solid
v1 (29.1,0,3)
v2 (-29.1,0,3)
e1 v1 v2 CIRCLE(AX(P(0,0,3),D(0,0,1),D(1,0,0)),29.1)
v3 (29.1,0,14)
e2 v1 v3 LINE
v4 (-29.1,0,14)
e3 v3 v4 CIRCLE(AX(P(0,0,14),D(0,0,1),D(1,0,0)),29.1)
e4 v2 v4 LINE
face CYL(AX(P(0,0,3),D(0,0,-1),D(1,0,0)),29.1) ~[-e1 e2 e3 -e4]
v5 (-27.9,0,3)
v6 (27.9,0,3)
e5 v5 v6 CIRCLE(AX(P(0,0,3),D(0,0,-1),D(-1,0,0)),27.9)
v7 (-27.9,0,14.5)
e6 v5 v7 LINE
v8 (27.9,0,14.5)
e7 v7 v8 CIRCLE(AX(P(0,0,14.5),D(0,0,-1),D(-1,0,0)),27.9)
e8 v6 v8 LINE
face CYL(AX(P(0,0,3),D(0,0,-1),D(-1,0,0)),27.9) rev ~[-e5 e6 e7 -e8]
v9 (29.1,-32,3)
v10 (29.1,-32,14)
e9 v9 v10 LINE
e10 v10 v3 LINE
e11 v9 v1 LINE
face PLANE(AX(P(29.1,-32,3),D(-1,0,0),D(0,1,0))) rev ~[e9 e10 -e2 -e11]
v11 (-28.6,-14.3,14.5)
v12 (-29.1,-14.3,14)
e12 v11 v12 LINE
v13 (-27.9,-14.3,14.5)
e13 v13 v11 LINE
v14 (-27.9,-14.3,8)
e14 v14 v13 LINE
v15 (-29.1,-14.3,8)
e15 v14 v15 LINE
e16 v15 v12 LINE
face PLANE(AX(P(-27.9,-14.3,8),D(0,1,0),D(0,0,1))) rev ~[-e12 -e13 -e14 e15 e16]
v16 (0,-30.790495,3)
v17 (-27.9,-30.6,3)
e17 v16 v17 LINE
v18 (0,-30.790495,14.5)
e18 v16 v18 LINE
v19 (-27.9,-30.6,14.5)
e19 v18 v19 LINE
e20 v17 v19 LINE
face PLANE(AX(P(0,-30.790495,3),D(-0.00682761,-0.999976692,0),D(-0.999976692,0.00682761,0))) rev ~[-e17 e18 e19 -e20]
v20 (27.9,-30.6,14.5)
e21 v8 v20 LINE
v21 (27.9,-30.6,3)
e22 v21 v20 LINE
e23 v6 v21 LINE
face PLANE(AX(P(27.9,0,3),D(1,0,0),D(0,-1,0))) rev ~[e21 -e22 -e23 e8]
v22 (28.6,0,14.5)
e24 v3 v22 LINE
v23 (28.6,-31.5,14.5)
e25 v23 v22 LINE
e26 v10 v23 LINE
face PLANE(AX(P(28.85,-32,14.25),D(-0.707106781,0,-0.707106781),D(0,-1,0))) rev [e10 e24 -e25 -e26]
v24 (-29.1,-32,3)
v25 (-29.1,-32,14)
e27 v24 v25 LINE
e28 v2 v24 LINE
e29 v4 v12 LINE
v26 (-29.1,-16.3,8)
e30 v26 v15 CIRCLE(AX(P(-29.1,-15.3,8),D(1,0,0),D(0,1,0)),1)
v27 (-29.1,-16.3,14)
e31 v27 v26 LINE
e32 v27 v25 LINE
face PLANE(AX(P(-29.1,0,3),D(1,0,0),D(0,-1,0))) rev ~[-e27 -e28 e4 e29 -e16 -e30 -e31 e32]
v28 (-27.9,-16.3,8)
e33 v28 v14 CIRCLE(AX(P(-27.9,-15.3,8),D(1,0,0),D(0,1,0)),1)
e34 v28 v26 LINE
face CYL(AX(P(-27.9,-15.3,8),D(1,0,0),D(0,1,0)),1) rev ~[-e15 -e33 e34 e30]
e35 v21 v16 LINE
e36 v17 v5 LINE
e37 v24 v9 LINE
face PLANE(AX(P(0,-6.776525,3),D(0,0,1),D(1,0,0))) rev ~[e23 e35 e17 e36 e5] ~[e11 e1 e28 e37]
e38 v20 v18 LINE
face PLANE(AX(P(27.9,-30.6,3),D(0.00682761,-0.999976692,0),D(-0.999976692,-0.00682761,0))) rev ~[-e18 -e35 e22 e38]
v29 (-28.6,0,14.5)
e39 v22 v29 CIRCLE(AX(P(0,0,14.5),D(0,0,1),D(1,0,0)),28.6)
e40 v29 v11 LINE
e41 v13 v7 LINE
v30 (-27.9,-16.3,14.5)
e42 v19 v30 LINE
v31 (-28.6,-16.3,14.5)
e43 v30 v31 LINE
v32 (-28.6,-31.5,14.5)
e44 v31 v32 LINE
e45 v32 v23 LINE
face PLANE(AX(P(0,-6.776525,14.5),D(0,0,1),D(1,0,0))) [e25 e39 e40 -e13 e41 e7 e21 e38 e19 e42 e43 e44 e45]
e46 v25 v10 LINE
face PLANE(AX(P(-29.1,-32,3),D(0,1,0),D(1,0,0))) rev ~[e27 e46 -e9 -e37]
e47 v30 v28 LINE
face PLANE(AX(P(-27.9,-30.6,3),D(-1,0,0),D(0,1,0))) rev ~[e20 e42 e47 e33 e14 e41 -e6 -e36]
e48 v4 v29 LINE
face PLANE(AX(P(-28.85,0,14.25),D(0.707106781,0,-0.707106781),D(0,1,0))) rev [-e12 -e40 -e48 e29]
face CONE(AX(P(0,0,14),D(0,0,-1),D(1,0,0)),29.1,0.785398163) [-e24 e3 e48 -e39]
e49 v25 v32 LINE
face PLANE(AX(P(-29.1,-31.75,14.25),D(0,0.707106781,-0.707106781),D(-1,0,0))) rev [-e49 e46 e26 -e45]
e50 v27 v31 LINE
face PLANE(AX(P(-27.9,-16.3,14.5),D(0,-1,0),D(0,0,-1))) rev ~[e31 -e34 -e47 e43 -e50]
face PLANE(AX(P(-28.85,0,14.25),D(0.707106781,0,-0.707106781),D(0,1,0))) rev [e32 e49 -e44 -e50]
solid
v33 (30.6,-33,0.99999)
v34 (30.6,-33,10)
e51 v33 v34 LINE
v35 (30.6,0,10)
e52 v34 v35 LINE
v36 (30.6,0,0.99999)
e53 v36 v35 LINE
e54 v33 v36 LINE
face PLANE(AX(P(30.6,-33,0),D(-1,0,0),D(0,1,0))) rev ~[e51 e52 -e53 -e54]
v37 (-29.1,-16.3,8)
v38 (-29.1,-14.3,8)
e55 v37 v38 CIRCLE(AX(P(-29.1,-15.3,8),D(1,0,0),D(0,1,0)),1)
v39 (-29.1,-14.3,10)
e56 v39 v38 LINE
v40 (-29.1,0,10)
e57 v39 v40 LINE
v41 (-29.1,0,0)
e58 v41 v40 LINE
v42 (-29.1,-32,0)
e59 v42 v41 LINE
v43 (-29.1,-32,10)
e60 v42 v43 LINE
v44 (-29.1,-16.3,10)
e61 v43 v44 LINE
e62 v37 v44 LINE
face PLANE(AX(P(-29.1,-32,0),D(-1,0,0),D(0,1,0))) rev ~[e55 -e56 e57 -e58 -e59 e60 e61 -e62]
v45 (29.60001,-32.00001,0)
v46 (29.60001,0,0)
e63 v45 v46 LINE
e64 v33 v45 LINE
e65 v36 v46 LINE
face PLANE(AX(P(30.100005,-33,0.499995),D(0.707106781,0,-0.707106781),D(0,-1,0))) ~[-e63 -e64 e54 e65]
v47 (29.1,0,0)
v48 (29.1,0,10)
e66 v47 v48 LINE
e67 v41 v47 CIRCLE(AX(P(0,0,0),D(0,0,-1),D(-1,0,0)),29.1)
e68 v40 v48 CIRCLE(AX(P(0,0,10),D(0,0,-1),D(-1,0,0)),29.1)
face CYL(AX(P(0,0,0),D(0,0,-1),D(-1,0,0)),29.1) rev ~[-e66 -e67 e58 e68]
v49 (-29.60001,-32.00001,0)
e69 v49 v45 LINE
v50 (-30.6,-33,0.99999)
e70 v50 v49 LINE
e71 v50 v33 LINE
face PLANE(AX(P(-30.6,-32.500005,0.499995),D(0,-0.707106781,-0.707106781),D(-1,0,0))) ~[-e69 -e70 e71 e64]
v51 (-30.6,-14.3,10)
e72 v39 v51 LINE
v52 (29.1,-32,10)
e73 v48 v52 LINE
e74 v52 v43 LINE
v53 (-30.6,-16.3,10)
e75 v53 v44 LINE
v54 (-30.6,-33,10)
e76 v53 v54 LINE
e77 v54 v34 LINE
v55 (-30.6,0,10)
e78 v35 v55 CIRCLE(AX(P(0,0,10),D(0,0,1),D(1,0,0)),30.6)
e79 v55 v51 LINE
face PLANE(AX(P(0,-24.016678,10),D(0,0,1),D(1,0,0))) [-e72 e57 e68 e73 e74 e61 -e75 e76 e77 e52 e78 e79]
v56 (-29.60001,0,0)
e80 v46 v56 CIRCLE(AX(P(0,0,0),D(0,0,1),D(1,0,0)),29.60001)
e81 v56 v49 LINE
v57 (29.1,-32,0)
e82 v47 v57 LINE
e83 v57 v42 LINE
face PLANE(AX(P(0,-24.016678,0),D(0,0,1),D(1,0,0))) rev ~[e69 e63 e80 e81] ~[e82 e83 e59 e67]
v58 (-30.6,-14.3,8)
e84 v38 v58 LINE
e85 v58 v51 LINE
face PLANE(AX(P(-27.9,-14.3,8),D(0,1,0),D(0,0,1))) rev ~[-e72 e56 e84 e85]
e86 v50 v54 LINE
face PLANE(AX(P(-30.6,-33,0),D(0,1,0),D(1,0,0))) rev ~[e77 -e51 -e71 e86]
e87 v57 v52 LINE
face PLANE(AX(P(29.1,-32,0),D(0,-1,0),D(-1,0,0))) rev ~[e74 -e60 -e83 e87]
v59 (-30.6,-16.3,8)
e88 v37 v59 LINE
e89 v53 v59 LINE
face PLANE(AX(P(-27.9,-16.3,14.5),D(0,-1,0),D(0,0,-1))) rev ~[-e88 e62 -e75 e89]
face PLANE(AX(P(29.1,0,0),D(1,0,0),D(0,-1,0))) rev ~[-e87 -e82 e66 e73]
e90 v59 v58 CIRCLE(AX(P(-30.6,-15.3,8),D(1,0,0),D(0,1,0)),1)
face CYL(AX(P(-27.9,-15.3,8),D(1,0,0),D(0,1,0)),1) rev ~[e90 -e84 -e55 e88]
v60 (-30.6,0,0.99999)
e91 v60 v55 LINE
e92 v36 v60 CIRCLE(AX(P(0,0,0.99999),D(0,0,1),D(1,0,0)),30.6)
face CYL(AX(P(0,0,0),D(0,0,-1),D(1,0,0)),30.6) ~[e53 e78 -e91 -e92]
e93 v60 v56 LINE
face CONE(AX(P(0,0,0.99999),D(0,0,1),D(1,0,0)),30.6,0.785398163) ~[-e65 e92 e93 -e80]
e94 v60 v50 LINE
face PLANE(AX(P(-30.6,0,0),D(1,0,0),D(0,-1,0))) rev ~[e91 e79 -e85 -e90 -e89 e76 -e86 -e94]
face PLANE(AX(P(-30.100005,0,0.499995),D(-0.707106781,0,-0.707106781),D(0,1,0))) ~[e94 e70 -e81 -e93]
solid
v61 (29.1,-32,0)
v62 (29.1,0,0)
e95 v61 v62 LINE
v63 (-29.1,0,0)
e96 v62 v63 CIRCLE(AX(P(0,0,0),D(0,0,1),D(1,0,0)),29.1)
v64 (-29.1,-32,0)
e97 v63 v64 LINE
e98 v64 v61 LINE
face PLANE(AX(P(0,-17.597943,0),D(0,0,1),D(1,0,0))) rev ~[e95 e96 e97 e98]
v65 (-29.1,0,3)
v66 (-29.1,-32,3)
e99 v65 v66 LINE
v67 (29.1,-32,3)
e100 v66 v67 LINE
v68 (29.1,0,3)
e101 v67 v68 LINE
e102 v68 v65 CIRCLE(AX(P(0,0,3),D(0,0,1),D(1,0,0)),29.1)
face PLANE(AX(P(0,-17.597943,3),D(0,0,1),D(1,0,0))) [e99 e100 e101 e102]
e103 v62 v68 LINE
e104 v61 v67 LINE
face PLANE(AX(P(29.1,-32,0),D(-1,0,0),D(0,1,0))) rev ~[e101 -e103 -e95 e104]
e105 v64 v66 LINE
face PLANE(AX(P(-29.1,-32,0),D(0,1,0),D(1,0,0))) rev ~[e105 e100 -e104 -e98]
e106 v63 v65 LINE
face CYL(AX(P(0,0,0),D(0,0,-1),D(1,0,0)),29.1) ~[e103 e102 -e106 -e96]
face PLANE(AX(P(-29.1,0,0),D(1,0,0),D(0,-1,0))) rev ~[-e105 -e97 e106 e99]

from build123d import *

# Parameters (mm, degrees)
F3_DEPTH  = 3
F4_DEPTH  = 10
F5_SIZE   = 0.99999
F8_DEPTH  = 11.5
F9_SIZE   = 0.5
F11_DEPTH = 25


# Not quite as in the source:
# - a fillet or chamfer is up to 0.001 mm smaller than in the source, because OpenCascade refuses the exact size
# - a feature of the source that left no trace in its solid (it failed there, or was rolled back) is left out
# - a feature names something its author has since deleted; it is built from what else it names


with BuildPart() as f3:
    # F2 (on Top) → F3 (new body)
    with BuildSketch(Plane.XY):
        with BuildLine():
            Line((29.1, -9.4630861774), (29.1, 0))
            ThreePointArc((29.1, 0), (0, -29.1), (-29.1, 0))
            Line((-29.1, 0), (-29.1, -9.4630861774))
            ThreePointArc((-29.1, -9.4630861774), (0, -30.6), (29.1, -9.4630861774))
        make_face()
        with BuildLine():
            ThreePointArc((-29.1, 0), (0, -29.1), (29.1, 0))
            Line((29.1, 0), (-29.1, 0))
        make_face()
        with BuildLine():
            Line((-29.1, 0), (29.1, 0))
            ThreePointArc((29.1, 0), (0, 29.1), (-29.1, 0))
        make_face()
        with BuildLine():
            Line((29.1, -32), (29.1, -9.4630861774))
            ThreePointArc((29.1, -9.4630861774), (0, -30.6), (-29.1, -9.4630861774))
            Line((-29.1, -9.4630861774), (-29.1, -32))
            Line((-29.1, -32), (29.1, -32))
        make_face()
    extrude(amount=F3_DEPTH)


with BuildPart() as f4:
    # F2 (on Top) → F4 (new body)
    with BuildSketch(Plane.XY):
        with BuildLine():
            ThreePointArc((30.6, 0), (30.2226736077, -4.7906158268), (29.1, -9.4630861774))
            Line((29.1, -9.4630861774), (29.1, -32))
            Line((29.1, -32), (-29.1, -32))
            Line((-29.1, -32), (-29.1, -9.4630861774))
            ThreePointArc((-29.1, -9.4630861774), (-30.2226736077, -4.7906158268), (-30.6, 0))
            Line((-30.6, 0), (-30.6, -33))
            Line((-30.6, -33), (30.6, -33))
            Line((30.6, -33), (30.6, 0))
        make_face()
        with BuildLine():
            ThreePointArc((-29.1, 0), (0, 29.1), (29.1, 0))
            Line((29.1, 0), (29.1, -9.4630861774))
            ThreePointArc((29.1, -9.4630861774), (30.2226736077, -4.7906158268), (30.6, 0))
            ThreePointArc((30.6, 0), (0, 30.6), (-30.6, 0))
            ThreePointArc((-30.6, 0), (-30.2226736077, -4.7906158268), (-29.1, -9.4630861774))
            Line((-29.1, -9.4630861774), (-29.1, 0))
        make_face()
    extrude(amount=F4_DEPTH)

    # F5 (size 1 in the source; OpenCascade refuses exactly that, so slightly less here)
    f5_edges = [f4.edges().sort_by_distance(p)[0] for p in [
        (30.6, -16.5, 0),
        (0, -33, 0),
        (-30.6, -16.5, 0),
        (0, 30.6, 0),
    ]]
    chamfer(f5_edges, length=F5_SIZE)


with BuildPart() as f8:
    # F6 (on face) → F8 (new body)
    with BuildSketch(Plane.XY.offset(3)):
        with BuildLine():
            Line((29.1, -32), (29.1, 0))
            ThreePointArc((29.1, 0), (0, 29.1), (-29.1, 0))
            Line((-29.1, 0), (-29.1, -32))
            Line((-29.1, -32), (29.1, -32))
        make_face()
        with BuildLine():
            ThreePointArc((-27.9, 0), (0, 27.9), (27.9, 0))
            Line((27.9, 0), (27.9, -30.6))
            Line((27.9, -30.6), (0, -30.7904947549))
            Line((0, -30.7904947549), (-27.9, -30.6))
            Line((-27.9, -30.6), (-27.9, 0))
        make_face(mode=Mode.SUBTRACT)
    extrude(amount=F8_DEPTH)

    # F9
    f9_edges = [f8.edges().sort_by_distance(p)[0] for p in [
        (-29.1, -16, 14.5),
        (0, 29.1, 14.5),
        (29.1, -16, 14.5),
        (0, -32, 14.5),
    ]]
    chamfer(f9_edges, length=F9_SIZE)


with BuildPart() as f11_tool:
    # F10 (on face) → F11 (new body)
    with BuildSketch(Plane.YZ.offset(-27.9)):
        with BuildLine():
            ThreePointArc((-16.3, 8), (-15.3, 7), (-14.3, 8))
            ThreePointArc((-14.3, 8), (-15.3, 9), (-16.3, 8))
        make_face()
        with BuildLine():
            ThreePointArc((-16.3, 8), (-15.3, 9), (-14.3, 8))
            Line((-14.3, 8), (-14.3, 14.5))
            Line((-14.3, 14.5), (-16.3, 14.5))
            Line((-16.3, 14.5), (-16.3, 8))
        make_face()
    extrude(amount=-F11_DEPTH)


with BuildPart() as f4_1:
    add(f4.part)

    # F11: cut by f11_tool
    add(f11_tool.part, mode=Mode.SUBTRACT)


with BuildPart() as f8_1:
    add(f8.part)

    # F11: cut by f11_tool
    add(f11_tool.part, mode=Mode.SUBTRACT)


solid = Compound([f3.part, f4_1.part, f8_1.part])
